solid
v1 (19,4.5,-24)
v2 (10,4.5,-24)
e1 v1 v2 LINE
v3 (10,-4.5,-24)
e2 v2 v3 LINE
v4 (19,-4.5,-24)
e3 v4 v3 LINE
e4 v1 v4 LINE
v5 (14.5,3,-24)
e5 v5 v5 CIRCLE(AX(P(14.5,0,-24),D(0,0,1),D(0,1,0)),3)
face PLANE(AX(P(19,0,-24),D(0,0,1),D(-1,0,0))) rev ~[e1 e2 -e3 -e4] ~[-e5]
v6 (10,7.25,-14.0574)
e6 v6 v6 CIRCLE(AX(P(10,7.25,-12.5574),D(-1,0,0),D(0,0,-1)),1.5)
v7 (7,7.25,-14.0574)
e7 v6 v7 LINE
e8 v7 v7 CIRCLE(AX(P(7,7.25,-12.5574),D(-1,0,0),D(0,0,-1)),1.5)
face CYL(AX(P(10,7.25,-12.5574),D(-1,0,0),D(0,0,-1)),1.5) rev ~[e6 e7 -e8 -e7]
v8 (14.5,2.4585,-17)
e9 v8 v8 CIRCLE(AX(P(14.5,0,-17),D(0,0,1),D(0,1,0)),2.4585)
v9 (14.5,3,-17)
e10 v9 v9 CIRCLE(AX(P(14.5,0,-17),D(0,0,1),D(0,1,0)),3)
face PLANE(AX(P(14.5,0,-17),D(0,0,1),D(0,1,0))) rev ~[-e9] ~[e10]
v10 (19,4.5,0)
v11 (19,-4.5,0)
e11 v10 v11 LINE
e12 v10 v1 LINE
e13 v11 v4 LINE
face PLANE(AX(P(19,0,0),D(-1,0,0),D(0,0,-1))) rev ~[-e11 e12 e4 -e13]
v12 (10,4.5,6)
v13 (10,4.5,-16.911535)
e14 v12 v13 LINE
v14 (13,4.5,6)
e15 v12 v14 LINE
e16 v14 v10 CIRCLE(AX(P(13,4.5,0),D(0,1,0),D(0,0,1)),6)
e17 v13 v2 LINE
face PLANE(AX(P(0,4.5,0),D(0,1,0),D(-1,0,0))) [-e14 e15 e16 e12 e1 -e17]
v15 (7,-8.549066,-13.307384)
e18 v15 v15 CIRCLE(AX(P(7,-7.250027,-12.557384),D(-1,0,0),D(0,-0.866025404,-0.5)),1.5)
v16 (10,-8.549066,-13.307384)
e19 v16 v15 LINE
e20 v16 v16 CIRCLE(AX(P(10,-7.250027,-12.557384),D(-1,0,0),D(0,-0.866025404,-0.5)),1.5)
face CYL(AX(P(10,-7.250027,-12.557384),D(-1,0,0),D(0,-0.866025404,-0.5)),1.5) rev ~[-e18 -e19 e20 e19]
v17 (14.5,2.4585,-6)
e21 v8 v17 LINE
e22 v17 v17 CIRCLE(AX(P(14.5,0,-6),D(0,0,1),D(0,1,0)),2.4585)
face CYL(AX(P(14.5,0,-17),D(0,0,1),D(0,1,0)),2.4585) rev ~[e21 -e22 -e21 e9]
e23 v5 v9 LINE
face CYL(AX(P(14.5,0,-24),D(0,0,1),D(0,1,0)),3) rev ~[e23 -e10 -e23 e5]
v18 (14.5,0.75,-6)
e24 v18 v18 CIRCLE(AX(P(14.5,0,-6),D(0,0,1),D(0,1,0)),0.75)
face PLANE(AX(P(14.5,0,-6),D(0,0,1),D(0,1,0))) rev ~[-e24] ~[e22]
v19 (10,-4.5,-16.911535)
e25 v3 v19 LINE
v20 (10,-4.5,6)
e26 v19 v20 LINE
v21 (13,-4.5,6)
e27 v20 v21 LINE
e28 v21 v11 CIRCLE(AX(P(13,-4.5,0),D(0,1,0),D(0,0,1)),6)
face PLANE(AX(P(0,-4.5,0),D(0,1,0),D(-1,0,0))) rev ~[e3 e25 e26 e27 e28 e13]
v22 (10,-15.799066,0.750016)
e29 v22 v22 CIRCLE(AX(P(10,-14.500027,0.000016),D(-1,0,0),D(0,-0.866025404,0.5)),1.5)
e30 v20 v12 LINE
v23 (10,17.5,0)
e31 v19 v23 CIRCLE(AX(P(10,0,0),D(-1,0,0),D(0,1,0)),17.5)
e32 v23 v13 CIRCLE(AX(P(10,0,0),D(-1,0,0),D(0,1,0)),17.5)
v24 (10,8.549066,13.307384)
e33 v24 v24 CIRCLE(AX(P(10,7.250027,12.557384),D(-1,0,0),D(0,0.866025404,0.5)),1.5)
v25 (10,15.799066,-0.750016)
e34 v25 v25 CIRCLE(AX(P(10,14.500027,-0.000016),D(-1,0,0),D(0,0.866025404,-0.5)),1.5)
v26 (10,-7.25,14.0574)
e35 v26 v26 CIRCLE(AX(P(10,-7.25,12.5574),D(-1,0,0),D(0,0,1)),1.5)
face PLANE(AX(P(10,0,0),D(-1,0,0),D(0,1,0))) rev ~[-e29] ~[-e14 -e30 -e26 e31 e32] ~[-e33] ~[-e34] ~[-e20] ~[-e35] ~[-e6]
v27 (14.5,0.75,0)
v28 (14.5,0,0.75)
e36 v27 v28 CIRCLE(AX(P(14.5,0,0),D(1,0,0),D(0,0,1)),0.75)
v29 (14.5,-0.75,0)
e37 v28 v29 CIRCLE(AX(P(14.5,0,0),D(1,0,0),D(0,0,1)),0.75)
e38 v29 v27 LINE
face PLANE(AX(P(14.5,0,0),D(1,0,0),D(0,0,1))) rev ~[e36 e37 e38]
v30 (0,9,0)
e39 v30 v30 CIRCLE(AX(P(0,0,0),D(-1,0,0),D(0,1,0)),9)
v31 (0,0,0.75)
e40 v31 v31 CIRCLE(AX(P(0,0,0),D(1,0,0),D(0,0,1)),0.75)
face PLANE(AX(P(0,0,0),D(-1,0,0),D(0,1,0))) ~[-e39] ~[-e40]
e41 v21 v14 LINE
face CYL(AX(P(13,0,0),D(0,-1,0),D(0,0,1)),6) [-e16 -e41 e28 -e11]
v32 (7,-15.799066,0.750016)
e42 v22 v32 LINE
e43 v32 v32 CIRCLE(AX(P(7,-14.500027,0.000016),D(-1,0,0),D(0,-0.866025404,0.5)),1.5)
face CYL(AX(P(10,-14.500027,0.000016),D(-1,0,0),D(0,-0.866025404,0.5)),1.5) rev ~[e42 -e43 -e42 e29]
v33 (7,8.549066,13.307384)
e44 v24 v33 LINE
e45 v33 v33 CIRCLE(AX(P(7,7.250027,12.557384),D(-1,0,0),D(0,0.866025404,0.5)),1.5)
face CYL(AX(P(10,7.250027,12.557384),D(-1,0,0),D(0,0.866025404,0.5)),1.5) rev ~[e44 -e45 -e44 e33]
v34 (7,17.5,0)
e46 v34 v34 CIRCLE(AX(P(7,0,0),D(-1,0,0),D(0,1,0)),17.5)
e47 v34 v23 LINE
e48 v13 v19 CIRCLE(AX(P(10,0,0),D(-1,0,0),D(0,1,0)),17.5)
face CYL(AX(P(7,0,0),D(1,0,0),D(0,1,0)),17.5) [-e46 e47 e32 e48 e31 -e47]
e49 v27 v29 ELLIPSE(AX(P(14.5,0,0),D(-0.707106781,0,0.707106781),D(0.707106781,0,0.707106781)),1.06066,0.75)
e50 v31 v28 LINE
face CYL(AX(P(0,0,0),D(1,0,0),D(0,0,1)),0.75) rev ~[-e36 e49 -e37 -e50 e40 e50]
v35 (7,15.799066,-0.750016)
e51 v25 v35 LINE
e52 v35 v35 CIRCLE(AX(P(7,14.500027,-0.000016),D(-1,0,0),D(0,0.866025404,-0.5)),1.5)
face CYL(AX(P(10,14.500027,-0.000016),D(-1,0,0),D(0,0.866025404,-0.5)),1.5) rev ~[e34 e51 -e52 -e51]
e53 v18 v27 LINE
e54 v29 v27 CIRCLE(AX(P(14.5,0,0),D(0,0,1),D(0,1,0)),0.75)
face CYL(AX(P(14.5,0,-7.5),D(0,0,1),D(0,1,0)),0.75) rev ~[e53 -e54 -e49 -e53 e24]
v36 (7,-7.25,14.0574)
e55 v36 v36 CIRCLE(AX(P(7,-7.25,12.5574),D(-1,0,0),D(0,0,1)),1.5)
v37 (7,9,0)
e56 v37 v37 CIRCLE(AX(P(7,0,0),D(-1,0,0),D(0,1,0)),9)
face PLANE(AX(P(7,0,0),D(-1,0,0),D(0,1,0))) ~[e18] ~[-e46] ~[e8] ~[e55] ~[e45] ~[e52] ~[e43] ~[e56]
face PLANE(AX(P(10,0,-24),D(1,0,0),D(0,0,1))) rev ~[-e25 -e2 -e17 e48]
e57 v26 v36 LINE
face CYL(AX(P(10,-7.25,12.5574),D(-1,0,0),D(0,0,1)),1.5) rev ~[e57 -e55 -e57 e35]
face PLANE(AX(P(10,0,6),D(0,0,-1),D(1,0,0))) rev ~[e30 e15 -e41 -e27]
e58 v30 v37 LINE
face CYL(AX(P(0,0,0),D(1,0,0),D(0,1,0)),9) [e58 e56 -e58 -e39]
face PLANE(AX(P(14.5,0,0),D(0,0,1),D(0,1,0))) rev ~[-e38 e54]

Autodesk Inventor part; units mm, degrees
ref_plane "YZ Plane" through (0, 0, 0) normal (1, 0, 0) x (0, 1, 0)
ref_plane "XZ Plane" through (0, 0, 0) normal (0, 1, 0) x (-1, 0, 0)
sketch "Sketch1" plane through (0, 0, 0) normal (0, 0, 1) x (1, 0, 0)
  line L0 (0, 0) -> (0, 9)
  line L1 (0, 9) -> (7, 9)
  line L2 (7, 9) -> (7, 17.5)
  line L3 (7, 17.5) -> (10, 17.5)
  line L4 (10, 17.5) -> (10, 0)
  line L5 (10, 0) -> (0, 0)
  dimension "d0" = 18
  dimension "d1" = 35
  dimension "d2" = 7
  dimension "d3" = 3
revolve "Revolution1" add sketch "Sketch1" angle 360 about axis through (10, 0, 0) along (-1, 0, 0)
sketch "Sketch2" plane through (0, 0, 0) normal (0, 1, 0) x (-1, 0, 0)
  line L0 (-10, -17.5) -> (-10, 17.5) projected
  line L1 (-10, 6) -> (-13, 6)
  line L2 (-19, 0) -> (-19, -24)
  line L3 (-19, -24) -> (-10, -24)
  line L4 (-10, -24) -> (-10, 6)
  line L5 (-10, -17.5) -> (-7, -17.5) projected
  arc A0 (-13, 6) -> (-19, 0) centre (-13, 0) ccw
  point P0 (0, 0)
  point P1 (-8.5, -17.5)
  dimension "d6" = 30
  dimension "d7" = 9
  dimension "d8" = 6.5
  dimension "d9" = 6
extrude "Extrusion1" add sketch "Sketch2" along normal mid plane 9
sketch "Sketch3" plane through (19, 4.5, -24) normal (0, 0, -1) x (-1, 0, 0)
  line L0 (9, 0) -> (9, -9) projected
  line L1 (0, 0) -> (9, 0) projected
  point P0 (19, -4.5)
  point P1 (4.5, -4.5)
  point P2 (9, -4.5)
  dimension "d19" = 4.5
  dimension "d20" = 4.5
hole "Hole1" at (14.5, 0, -24) direction (0, 0, 1) diameter 4.917 depth 18 counterbore diameter 6 counterbore depth 7 thread size "M6x1" class "6H" standard "ISO Metric profile"
ref_plane "Work Plane1" through (0, 0, -7.5) normal (0, 0, 1) x (1, 0, 0)
sketch "Sketch4" plane through (0, 0, -7.5) normal (0, 0, 1) x (1, 0, 0)
  circle A0 centre (14.5, 0) radius 3 projected
  point P0 (0, 0)
hole "Hole2" at (14.5, 0, -7.5) direction (0, 0, 1) diameter 1.5 depth 7.5
sketch "Sketch5" plane through (10, 0, 0) normal (1, 0, 0) x (0, 0, -1)
  line L0 (-6, 4.5) -> (16.9115, 4.5) projected
  arc A0 (16.9115, 4.5) -> (16.9115, -4.5) centre (0, 0) ccw projected
  line L1 (16.9115, -4.5) -> (-6, -4.5) projected
  line L2 (-6, -4.5) -> (-6, 4.5) projected
  circle A1 centre (0, 0) radius 14.5 construction
  line L3 (0, -4.5) -> (0, 4.5) projected
  line L4 (0, 0) -> (12.5574, 7.25) construction
  line L5 (0, 0) -> (27.6817, 0) construction
  dimension "d29" = 29
  dimension "d30" = 30
hole "Hole3" at (10, 7.25, -12.5574) direction (-1, 0, 0) diameter 3 depth 3
pattern_circular "Circular Pattern1" count 6 over 360 about axis through (8.5, 0, 0) along (-1, 0, 0) of "Hole3"
sketch "Sketch6" plane through (0, 0, 0) normal (-1, 0, 0) x (0, 0, 1)
  circle A0 centre (0, 0) radius 9 projected
hole "Hole4" at (0, 0, 0) direction (1, 0, 0) diameter 1.5 depth 14.5
properties part number "155 part 1" material "Gold"
